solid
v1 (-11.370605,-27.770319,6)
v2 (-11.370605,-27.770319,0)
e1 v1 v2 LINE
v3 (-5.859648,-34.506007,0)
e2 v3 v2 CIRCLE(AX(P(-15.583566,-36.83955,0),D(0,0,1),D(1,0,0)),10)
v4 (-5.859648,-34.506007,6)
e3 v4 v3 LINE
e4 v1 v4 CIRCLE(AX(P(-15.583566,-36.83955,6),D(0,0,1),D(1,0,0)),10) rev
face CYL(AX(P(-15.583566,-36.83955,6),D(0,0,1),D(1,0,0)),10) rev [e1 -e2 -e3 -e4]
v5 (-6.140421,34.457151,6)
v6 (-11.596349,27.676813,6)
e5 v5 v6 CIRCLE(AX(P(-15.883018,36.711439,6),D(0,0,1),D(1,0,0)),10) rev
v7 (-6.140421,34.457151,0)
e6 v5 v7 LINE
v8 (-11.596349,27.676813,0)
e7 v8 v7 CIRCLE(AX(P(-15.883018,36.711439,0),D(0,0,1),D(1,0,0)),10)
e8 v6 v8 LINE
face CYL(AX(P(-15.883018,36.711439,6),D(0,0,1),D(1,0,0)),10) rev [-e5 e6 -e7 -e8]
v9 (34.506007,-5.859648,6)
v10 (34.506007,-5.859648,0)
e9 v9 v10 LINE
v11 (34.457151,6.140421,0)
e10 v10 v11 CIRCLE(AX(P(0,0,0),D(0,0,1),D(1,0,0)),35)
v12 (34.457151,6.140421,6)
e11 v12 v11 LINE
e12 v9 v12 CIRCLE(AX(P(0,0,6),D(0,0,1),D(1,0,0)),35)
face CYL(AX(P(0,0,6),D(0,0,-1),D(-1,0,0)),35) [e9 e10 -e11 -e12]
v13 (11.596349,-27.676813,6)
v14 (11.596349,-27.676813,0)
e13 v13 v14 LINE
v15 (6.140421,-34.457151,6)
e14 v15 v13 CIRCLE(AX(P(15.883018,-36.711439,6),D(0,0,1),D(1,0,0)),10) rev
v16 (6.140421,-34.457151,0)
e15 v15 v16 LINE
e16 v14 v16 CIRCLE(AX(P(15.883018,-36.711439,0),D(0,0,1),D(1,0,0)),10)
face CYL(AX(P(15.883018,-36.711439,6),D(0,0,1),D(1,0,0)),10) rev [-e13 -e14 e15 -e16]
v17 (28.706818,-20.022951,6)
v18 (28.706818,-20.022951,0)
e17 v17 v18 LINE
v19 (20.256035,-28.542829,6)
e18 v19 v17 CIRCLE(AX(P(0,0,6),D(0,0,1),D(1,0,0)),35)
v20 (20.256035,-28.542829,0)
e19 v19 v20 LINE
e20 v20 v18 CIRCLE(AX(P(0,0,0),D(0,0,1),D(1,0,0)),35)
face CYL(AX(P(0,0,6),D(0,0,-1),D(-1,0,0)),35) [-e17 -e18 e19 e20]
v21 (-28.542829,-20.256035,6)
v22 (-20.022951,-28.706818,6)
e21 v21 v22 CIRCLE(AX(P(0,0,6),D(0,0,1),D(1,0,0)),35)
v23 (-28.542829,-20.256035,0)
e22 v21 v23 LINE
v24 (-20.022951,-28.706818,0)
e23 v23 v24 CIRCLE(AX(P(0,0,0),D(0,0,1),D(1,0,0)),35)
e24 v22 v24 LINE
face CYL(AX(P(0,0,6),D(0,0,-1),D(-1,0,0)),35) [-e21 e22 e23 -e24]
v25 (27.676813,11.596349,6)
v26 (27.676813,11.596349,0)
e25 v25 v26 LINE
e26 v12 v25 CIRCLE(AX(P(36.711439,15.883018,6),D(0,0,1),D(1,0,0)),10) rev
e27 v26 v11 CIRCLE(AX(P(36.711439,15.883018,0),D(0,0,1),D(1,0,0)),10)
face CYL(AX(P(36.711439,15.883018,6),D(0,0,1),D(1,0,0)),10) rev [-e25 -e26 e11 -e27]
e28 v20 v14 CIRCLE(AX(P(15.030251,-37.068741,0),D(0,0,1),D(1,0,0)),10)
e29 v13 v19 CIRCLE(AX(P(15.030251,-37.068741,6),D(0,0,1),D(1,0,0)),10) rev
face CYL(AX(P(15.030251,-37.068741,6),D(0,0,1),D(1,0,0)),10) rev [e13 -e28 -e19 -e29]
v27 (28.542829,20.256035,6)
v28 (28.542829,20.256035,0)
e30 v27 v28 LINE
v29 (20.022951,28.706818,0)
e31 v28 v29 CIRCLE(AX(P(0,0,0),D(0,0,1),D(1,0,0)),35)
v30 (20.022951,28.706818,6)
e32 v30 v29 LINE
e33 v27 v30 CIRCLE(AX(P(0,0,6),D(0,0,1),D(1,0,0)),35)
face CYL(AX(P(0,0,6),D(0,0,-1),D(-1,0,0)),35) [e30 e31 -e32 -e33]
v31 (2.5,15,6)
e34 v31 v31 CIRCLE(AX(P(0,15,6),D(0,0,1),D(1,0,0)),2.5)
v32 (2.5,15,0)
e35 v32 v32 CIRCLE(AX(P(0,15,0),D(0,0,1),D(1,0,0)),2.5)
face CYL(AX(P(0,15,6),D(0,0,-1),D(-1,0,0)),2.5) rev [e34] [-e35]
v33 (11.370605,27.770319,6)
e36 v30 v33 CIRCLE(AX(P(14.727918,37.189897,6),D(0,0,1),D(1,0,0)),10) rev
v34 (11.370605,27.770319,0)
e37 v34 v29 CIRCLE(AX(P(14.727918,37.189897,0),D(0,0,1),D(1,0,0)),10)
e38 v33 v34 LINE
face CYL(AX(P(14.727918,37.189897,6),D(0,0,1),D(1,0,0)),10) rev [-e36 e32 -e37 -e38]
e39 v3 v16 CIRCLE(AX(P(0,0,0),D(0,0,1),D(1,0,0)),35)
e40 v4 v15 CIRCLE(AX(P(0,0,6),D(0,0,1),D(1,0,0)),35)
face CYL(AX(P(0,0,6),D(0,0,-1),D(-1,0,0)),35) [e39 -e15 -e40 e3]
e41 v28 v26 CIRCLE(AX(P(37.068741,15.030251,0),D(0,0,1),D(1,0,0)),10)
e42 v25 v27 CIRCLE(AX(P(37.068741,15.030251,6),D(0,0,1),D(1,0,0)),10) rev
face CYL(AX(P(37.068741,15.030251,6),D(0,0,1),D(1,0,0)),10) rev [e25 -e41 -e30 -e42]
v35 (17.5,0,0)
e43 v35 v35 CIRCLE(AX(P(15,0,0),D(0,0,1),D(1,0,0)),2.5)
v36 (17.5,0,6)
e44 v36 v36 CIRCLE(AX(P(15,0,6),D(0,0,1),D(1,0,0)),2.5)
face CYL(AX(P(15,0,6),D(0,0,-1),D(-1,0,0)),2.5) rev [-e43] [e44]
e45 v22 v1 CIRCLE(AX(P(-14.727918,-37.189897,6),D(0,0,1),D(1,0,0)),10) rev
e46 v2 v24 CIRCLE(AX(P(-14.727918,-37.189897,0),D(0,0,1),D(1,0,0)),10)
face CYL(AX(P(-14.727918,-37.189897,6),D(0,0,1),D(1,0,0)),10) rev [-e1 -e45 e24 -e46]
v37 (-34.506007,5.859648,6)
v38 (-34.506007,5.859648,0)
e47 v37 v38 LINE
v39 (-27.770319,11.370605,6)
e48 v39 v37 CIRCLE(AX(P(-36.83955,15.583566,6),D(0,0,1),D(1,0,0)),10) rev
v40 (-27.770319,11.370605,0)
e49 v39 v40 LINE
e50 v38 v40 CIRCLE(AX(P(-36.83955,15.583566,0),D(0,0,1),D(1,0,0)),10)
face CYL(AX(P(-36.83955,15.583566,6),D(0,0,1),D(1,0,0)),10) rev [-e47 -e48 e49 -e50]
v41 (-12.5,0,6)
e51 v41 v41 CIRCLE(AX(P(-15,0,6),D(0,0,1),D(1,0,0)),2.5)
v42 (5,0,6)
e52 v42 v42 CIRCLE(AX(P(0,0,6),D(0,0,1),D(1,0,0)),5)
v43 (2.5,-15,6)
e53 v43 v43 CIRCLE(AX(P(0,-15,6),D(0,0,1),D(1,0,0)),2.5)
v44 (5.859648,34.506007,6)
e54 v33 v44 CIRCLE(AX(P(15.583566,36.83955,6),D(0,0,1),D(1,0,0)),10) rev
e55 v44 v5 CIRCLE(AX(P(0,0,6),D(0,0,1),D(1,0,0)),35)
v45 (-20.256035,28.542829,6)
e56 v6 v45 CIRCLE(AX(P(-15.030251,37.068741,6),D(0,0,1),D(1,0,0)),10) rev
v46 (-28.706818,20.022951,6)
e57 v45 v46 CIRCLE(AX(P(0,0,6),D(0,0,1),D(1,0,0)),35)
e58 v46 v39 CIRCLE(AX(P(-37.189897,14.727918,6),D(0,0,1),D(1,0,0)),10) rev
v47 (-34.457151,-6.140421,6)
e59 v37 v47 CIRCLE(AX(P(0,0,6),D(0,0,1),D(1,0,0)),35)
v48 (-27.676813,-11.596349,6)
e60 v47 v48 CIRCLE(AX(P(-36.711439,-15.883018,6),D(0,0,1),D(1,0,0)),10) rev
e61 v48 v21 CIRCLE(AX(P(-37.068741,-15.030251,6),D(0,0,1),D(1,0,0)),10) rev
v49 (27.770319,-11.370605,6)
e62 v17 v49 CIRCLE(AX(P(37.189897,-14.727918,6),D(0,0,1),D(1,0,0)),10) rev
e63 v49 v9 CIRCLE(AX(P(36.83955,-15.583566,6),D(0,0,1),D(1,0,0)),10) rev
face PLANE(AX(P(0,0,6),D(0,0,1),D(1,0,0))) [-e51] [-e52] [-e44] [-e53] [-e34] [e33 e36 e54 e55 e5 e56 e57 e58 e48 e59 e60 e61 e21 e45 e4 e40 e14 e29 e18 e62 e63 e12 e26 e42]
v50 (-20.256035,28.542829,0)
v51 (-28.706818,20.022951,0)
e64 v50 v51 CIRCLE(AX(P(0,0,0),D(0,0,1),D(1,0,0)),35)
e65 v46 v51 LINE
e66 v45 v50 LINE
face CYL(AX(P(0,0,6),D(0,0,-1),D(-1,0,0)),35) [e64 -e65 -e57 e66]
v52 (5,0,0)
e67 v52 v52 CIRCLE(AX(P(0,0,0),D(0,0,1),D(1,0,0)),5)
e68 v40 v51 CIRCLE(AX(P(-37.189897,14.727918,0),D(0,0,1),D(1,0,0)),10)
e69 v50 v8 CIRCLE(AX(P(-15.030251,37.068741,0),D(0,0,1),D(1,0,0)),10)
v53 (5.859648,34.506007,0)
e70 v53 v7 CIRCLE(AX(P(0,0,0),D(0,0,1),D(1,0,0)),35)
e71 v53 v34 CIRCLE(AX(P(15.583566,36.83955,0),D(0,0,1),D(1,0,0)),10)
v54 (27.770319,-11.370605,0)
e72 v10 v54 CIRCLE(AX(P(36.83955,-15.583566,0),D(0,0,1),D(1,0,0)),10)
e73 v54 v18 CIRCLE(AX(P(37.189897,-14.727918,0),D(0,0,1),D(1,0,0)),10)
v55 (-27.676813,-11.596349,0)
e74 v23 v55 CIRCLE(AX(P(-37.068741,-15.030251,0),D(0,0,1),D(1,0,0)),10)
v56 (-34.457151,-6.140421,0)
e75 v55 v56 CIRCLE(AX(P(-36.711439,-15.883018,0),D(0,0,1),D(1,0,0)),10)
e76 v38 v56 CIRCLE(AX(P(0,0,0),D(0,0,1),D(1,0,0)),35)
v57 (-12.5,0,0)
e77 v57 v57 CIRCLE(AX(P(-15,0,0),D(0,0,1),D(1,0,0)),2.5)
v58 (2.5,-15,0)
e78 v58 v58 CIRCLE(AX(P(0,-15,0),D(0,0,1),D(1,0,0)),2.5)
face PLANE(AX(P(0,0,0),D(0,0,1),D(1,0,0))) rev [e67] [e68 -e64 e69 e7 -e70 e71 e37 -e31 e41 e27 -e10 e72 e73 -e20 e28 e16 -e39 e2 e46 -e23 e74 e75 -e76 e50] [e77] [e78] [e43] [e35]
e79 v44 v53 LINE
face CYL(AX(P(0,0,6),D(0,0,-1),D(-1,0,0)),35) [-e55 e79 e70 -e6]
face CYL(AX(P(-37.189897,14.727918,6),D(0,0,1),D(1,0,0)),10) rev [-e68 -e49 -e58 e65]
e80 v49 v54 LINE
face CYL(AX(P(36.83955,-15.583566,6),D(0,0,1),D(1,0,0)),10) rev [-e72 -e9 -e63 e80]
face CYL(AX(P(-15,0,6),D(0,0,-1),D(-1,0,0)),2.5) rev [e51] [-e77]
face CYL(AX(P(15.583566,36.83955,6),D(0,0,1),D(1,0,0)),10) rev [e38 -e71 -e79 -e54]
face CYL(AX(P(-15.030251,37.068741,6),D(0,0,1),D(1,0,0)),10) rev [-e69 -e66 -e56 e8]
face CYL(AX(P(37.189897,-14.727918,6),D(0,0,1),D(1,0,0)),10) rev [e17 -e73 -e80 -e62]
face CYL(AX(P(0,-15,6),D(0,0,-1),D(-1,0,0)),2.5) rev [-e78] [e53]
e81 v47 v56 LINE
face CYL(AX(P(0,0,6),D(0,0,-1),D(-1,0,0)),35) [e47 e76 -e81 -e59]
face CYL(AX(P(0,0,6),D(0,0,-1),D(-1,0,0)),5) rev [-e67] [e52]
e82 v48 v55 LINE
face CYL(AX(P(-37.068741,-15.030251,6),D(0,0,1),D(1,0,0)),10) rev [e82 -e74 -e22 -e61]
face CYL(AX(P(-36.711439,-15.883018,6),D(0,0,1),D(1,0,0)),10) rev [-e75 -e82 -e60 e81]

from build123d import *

# Parameters (mm, degrees)
SKETCH1_R           = 2.5
SKETCH1_R_2         = 5
BOSS_EXTRUDE1_DEPTH = 6
FILLET1_R           = 10


with BuildPart() as part:
    # Sketch1 → Boss-Extrude1 (new body)
    with BuildSketch(Plane.XY):
        with BuildLine():
            Line((-6.140421203, 34.4571506), (-7.075568353, 29.153667565))
            ThreePointArc((-7.075568353, 29.153667565), (-11.615235602, 27.660193454), (-15.860146326, 25.464794492))
            Line((-15.860146326, 25.464794492), (-20.256034573, 28.54282858))
            ThreePointArc((-20.256034573, 28.54282858), (-24.849292098, 24.647772358), (-28.706818321, 20.022951378))
            Line((-28.706818321, 20.022951378), (-25.617938395, 15.611573668))
            ThreePointArc((-25.617938395, 15.611573668), (-27.77192222, 11.345498501), (-29.221145884, 6.791511849))
            Line((-29.221145884, 6.791511849), (-34.50600705, 5.859648236))
            ThreePointArc((-34.50600705, 5.859648236), (-34.999709926, -0.142495975), (-34.4571506, -6.140421203))
            Line((-34.4571506, -6.140421203), (-29.153667565, -7.075568353))
            ThreePointArc((-29.153667565, -7.075568353), (-27.660193454, -11.615235602), (-25.464794492, -15.860146326))
            Line((-25.464794492, -15.860146326), (-28.54282858, -20.256034573))
            ThreePointArc((-28.54282858, -20.256034573), (-24.647772358, -24.849292098), (-20.022951378, -28.706818321))
            Line((-20.022951378, -28.706818321), (-15.611573668, -25.617938395))
            ThreePointArc((-15.611573668, -25.617938395), (-11.345498501, -27.77192222), (-6.791511849, -29.221145884))
            Line((-6.791511849, -29.221145884), (-5.859648236, -34.50600705))
            ThreePointArc((-5.859648236, -34.50600705), (0.142495975, -34.999709926), (6.140421203, -34.4571506))
            Line((6.140421203, -34.4571506), (7.075568353, -29.153667565))
            ThreePointArc((7.075568353, -29.153667565), (11.615235602, -27.660193454), (15.860146326, -25.464794492))
            Line((15.860146326, -25.464794492), (20.256034573, -28.54282858))
            ThreePointArc((20.256034573, -28.54282858), (24.849292098, -24.647772358), (28.706818321, -20.022951378))
            Line((28.706818321, -20.022951378), (25.617938395, -15.611573668))
            ThreePointArc((25.617938395, -15.611573668), (27.77192222, -11.345498501), (29.221145884, -6.791511849))
            Line((29.221145884, -6.791511849), (34.50600705, -5.859648236))
            ThreePointArc((34.50600705, -5.859648236), (34.999709926, 0.142495975), (34.4571506, 6.140421203))
            Line((34.4571506, 6.140421203), (29.153667565, 7.075568353))
            ThreePointArc((29.153667565, 7.075568353), (27.660193454, 11.615235602), (25.464794492, 15.860146326))
            Line((25.464794492, 15.860146326), (28.54282858, 20.256034573))
            ThreePointArc((28.54282858, 20.256034573), (24.647772358, 24.849292098), (20.022951378, 28.706818321))
            Line((20.022951378, 28.706818321), (15.611573668, 25.617938395))
            ThreePointArc((15.611573668, 25.617938395), (11.345498501, 27.77192222), (6.791511849, 29.221145884))
            Line((6.791511849, 29.221145884), (5.859648236, 34.50600705))
            ThreePointArc((5.859648236, 34.50600705), (-0.142495975, 34.999709926), (-6.140421203, 34.4571506))
        make_face()
        with Locations((0, 15)):
            Circle(SKETCH1_R, mode=Mode.SUBTRACT)
        with Locations((15, 0)):
            Circle(SKETCH1_R, mode=Mode.SUBTRACT)
        with Locations((0, -15)):
            Circle(SKETCH1_R, mode=Mode.SUBTRACT)
        with Locations((-15, 0)):
            Circle(SKETCH1_R, mode=Mode.SUBTRACT)
        Circle(SKETCH1_R_2, mode=Mode.SUBTRACT)
    extrude(amount=BOSS_EXTRUDE1_DEPTH)

    # Fillet1
    # the kernel refuses this fillet: 10 mm, written as the material it adds along each edge
    with BuildSketch(Plane(origin=(6.791511849, 29.221145884, 0), x_dir=(0.9510209214740128, -0.3091265225093435, 0), z_dir=(0, 0, 1)), Plane(origin=(25.464794492, 15.860146326, 0), x_dir=(0.45388788231358146, -0.891058802935526, 0), z_dir=(0, 0, 1)), Plane(origin=(29.221145884, -6.791511849, 0), x_dir=(-0.3091265225093466, -0.9510209214740117, 0), z_dir=(0, 0, 1)), Plane(origin=(15.860146326, -25.464794492, 0), x_dir=(-0.8910588029355269, -0.45388788231357946, 0), z_dir=(0, 0, 1)), Plane(origin=(-6.791511849, -29.221145884, 0), x_dir=(-0.9510209214740112, 0.30912652250934813, 0), z_dir=(0, 0, 1)), Plane(origin=(-25.464794492, -15.860146326, 0), x_dir=(-0.4538878823135736, 0.8910588029355299, 0), z_dir=(0, 0, 1)), Plane(origin=(-29.221145884, 6.791511849, 0), x_dir=(0.30912652250934974, 0.9510209214740107, 0), z_dir=(0, 0, 1)), Plane(origin=(-15.860146326, 25.464794492, 0), x_dir=(0.8910588029355312, 0.45388788231357124, 0), z_dir=(0, 0, 1))) as fillet1_piece_1:
        with BuildLine():
            CenterArc((6.006376492, 9.963119175), FILLET1_R, 211.501234777, 53.576426358)
            Line((-2.519912546, 4.737949778), (-2.690438327, 4.63344639))
            ThreePointArc((-2.690438327, 4.63344639), (-1.436534977, 2.27506024), (-0.176578704, -0.093914649))
            Line((-0.176578704, -0.093914649), (0.017161076, -0.199262384))
            ThreePointArc((0.017161076, -0.199262384), (2.574161354, -0.089357526), (5.131161632, -0.199262384))
            Line((5.131161632, -0.199262384), (5.148322708, 0))
        make_face()
    extrude(amount=6)
    with BuildSketch(Plane(origin=(15.611573668, 25.617938395, 0), x_dir=(0.8191520442889787, 0.5735764363510647, 0), z_dir=(0, 0, 1)), Plane(origin=(29.153667565, 7.075568353, 0), x_dir=(0.9848077530122112, -0.17364817766691212, 0), z_dir=(0, 0, 1)), Plane(origin=(25.617938395, -15.611573668, 0), x_dir=(0.5735764363510597, -0.8191520442889821, 0), z_dir=(0, 0, 1)), Plane(origin=(7.075568353, -29.153667565, 0), x_dir=(-0.1736481776669137, -0.9848077530122109, 0), z_dir=(0, 0, 1)), Plane(origin=(-15.611573668, -25.617938395, 0), x_dir=(-0.8191520442889838, -0.5735764363510576, 0), z_dir=(0, 0, 1)), Plane(origin=(-29.153667565, -7.075568353, 0), x_dir=(-0.9848077530122104, 0.17364817766691737, 0), z_dir=(0, 0, 1)), Plane(origin=(-25.617938395, 15.611573668, 0), x_dir=(-0.5735764363510546, 0.8191520442889858, 0), z_dir=(0, 0, 1)), Plane(origin=(-7.075568353, 29.153667565, 0), x_dir=(0.17364817766690768, 0.984807753012212, 0), z_dir=(0, 0, 1))) as fillet1_piece_2:
        with BuildLine():
            CenterArc((5.913554395, 9.986037501), FILLET1_R, 213.395476897, 53.576426358)
            Line((-2.435358777, 4.481889172), (-2.602337041, 4.371806205))
            ThreePointArc((-2.602337041, 4.371806205), (-1.297983622, 2.197309054), (-0.183213989, -0.080203705))
            Line((-0.183213989, -0.080203705), (0, -0.2))
            ThreePointArc((0, -0.2), (2.692648905, -0.2), (5.374732678, -0.19972075))
            Line((5.374732678, -0.19972075), (5.385297809, 0))
        make_face()
    extrude(amount=6)


solid = part.part
